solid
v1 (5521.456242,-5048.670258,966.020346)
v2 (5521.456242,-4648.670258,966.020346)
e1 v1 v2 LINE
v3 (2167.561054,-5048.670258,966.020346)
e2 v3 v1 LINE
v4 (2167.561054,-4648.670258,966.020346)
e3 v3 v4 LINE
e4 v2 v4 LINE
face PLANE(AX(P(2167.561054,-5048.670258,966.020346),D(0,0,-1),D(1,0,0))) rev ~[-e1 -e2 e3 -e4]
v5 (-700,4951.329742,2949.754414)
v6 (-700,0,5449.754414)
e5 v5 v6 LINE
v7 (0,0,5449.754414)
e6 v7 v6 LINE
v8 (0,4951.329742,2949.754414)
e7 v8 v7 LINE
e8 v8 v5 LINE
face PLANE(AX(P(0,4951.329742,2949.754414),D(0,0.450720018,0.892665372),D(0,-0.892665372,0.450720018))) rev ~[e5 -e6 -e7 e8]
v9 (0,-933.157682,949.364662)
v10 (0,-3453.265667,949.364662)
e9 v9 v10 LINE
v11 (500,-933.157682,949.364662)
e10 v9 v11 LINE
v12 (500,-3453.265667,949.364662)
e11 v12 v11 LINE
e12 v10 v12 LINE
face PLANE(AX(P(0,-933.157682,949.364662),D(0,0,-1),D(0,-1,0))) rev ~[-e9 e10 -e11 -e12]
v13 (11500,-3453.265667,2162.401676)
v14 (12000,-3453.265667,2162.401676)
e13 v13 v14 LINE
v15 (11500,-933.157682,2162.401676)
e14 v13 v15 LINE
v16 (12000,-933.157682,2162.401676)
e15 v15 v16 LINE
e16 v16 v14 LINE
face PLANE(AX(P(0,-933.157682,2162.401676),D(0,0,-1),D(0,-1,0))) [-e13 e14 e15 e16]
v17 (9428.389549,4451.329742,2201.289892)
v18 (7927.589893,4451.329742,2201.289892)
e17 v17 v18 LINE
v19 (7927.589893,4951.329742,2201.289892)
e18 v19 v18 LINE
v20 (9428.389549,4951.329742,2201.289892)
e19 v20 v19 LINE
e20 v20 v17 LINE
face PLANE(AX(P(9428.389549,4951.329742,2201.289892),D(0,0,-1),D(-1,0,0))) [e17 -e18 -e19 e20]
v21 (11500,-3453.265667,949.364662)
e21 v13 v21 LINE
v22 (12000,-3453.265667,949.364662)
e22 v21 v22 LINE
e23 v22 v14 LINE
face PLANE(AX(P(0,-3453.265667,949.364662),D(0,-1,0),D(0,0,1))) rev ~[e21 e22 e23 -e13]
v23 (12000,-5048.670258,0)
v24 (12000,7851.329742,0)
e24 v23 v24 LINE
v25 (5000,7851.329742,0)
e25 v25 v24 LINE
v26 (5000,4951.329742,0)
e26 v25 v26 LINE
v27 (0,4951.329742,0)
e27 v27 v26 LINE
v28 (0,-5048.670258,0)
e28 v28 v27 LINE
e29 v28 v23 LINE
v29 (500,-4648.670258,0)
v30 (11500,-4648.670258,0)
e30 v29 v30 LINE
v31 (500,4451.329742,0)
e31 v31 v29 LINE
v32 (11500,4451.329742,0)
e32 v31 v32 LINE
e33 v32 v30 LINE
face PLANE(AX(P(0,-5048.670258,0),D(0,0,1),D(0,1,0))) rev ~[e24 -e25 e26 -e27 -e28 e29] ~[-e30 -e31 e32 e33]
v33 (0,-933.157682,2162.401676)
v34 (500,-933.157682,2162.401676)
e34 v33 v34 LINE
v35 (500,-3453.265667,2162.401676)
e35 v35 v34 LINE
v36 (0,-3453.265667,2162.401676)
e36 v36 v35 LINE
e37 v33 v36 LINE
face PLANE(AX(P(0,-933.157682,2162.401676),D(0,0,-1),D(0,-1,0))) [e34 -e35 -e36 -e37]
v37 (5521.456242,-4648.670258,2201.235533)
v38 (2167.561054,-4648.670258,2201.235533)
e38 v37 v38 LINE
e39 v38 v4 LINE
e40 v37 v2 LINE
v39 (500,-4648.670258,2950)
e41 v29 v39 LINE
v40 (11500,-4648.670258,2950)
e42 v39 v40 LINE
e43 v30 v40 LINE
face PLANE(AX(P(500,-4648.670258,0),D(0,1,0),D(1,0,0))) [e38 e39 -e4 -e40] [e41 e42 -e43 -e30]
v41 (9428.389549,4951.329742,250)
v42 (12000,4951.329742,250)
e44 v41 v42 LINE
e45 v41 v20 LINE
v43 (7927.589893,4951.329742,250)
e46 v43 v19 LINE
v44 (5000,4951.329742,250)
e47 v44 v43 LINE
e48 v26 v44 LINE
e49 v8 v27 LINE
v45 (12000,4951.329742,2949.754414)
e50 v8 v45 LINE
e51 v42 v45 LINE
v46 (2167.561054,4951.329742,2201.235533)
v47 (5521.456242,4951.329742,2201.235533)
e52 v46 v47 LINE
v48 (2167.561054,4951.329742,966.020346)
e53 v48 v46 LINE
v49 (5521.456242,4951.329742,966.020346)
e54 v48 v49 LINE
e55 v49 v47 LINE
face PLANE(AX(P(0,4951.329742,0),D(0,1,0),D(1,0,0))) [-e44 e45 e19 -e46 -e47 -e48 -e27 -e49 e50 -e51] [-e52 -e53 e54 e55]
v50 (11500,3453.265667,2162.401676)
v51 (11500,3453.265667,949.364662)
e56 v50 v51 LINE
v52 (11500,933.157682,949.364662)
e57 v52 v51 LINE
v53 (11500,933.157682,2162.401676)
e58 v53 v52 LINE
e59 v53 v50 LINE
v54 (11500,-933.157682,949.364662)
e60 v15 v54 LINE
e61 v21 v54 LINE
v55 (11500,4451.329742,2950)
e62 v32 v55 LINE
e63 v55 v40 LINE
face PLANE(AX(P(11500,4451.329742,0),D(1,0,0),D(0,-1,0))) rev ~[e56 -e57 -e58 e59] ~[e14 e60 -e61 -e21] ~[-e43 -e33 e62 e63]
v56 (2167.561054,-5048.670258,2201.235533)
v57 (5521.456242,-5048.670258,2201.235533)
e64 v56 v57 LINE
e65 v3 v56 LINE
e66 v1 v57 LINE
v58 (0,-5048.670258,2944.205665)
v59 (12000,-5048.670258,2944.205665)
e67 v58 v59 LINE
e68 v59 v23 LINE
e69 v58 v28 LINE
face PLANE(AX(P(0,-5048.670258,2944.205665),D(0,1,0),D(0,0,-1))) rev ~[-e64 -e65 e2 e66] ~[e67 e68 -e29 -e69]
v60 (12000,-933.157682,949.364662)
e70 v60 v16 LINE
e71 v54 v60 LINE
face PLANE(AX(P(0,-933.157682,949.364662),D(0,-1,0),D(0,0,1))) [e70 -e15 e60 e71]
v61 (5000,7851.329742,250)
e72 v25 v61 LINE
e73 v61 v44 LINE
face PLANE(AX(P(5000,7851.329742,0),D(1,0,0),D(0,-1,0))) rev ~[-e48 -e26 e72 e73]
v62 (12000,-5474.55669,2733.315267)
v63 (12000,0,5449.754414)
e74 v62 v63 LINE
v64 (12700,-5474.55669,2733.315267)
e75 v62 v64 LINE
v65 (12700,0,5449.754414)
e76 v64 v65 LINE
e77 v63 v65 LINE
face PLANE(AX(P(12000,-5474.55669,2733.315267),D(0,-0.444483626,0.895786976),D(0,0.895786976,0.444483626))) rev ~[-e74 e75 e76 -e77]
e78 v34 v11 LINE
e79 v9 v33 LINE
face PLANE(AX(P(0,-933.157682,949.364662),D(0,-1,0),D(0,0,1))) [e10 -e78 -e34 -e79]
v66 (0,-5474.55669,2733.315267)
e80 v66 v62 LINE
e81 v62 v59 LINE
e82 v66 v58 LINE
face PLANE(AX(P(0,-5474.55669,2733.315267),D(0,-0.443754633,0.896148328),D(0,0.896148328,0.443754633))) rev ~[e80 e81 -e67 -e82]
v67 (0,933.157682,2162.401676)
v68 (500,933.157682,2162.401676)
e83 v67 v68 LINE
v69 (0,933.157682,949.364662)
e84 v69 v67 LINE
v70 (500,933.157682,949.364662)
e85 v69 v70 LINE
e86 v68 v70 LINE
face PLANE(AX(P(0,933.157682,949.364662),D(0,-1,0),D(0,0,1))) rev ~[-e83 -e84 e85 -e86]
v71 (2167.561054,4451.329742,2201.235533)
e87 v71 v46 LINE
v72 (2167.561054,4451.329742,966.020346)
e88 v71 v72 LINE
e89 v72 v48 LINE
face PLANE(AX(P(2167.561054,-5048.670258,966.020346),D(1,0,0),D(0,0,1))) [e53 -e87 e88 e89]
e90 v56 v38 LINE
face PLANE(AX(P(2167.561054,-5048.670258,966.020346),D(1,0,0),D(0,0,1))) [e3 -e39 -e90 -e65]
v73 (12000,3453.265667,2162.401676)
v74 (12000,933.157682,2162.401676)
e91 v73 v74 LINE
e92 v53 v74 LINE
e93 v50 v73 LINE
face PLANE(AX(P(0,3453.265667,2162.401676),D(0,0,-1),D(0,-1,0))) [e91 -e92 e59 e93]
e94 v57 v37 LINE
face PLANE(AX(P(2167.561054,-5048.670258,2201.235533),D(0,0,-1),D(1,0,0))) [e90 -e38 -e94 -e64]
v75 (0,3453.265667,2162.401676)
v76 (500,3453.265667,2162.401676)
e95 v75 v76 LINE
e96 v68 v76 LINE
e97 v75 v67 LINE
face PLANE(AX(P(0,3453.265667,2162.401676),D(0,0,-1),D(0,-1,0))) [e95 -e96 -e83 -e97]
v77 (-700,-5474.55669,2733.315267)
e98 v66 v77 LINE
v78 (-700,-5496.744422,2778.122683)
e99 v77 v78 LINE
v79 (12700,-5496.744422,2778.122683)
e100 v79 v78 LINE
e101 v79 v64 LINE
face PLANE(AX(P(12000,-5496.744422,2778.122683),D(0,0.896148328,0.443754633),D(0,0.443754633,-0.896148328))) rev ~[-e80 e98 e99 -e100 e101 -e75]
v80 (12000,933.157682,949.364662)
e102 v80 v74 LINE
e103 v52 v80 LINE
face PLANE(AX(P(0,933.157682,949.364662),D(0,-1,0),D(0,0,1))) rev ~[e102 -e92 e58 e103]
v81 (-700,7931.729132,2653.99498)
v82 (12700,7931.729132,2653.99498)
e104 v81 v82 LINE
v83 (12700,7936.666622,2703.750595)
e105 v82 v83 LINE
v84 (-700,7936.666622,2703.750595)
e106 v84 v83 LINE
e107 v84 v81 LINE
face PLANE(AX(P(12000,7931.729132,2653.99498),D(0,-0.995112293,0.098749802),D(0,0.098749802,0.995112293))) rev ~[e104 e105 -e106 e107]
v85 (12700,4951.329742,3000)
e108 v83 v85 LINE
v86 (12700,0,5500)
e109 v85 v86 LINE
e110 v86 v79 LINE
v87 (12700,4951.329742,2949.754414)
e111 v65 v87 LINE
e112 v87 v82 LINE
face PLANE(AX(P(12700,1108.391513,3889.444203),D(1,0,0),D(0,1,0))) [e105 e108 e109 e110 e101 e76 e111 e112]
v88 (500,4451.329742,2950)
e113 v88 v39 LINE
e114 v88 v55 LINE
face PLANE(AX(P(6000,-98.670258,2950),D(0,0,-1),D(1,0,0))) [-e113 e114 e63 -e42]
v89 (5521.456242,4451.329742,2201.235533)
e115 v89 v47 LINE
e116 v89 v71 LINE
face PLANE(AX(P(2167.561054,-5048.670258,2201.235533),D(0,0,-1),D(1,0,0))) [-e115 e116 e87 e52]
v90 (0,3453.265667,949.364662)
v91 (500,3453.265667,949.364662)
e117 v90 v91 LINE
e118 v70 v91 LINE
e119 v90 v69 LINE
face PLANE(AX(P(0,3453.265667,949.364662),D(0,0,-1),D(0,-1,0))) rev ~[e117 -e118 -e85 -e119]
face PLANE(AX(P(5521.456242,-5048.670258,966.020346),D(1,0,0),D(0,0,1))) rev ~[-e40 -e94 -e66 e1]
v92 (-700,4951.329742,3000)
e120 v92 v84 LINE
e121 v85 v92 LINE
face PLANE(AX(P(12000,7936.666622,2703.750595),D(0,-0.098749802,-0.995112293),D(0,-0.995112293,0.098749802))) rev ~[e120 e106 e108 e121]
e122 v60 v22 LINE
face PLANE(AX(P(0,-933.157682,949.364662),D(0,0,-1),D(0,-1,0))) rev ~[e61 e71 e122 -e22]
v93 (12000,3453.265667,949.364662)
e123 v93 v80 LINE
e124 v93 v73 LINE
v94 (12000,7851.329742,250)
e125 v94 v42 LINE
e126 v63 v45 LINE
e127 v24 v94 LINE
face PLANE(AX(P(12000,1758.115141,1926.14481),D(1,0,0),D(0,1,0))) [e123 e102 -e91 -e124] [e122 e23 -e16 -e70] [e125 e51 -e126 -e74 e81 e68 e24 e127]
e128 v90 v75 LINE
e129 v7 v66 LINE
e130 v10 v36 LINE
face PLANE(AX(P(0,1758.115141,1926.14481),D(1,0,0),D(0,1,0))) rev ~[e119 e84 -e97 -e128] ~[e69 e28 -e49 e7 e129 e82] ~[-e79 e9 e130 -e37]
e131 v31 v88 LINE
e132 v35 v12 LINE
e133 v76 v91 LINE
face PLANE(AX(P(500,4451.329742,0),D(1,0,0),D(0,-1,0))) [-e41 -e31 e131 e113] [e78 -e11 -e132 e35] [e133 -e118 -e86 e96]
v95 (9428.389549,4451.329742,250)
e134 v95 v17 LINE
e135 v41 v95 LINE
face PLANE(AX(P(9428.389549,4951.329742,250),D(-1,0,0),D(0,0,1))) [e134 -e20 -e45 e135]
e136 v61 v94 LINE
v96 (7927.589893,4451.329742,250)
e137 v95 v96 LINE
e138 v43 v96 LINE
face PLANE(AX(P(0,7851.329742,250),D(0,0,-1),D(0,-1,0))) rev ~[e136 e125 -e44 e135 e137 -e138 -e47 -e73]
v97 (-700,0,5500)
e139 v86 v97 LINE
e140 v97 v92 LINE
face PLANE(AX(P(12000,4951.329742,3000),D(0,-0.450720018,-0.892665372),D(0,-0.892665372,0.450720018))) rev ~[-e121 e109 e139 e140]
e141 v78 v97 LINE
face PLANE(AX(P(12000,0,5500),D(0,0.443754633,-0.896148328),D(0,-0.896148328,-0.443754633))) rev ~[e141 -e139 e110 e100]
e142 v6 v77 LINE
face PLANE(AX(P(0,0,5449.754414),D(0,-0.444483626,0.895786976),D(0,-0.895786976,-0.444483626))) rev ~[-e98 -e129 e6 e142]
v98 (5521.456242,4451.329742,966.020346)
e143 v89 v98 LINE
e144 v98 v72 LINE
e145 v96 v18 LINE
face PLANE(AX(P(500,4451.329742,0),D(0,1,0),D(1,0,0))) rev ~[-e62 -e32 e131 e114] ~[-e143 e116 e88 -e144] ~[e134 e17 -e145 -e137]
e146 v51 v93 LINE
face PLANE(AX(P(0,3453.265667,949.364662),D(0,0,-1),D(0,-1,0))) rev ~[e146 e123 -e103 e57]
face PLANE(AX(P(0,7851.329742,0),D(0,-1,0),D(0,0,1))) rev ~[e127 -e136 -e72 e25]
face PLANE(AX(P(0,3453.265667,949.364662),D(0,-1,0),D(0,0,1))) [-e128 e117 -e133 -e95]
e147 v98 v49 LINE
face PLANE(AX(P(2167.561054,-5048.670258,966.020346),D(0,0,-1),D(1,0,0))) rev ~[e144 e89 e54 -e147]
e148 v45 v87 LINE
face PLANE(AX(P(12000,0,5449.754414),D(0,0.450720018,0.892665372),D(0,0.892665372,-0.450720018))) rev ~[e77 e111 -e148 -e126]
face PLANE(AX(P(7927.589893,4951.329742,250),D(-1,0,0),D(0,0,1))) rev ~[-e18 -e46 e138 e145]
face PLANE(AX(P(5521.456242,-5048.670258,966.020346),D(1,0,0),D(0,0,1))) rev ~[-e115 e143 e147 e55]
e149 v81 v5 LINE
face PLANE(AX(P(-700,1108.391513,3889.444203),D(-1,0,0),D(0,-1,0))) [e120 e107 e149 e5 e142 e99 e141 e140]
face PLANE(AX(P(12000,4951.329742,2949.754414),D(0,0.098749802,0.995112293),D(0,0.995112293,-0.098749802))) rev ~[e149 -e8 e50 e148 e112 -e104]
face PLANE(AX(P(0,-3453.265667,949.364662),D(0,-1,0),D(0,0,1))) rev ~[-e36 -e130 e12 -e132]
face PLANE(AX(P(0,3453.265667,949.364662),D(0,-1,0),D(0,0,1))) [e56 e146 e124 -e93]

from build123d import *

# Parameters (mm, degrees)
F1_DEPTH  = 12000
F2_W      = 5000
F2_H      = 2900
F3_DEPTH  = 250
F5_DEPTH  = 700
F7_DEPTH  = 700
F8_W      = 11000
F8_H      = 9100
F9_DEPTH  = 2950
F10_W     = 2520.1079845428
F10_H     = 1213.0370140076
F11_DEPTH = 12000
F12_W     = 3353.8951873779
F12_H     = 1235.2151870728
F13_DEPTH = 10000
F14_W     = 1500.7996559143
F14_H     = 1951.2898921967
F15_DEPTH = 500


with BuildPart() as f1:
    # F0 (on Right) → F1 (new body)
    with BuildSketch(Plane.YZ):
        Polygon((-5048.6702581479, 2944.2056650102), (-5048.6702581479, 0), (4951.3297418521, 0), (7851.3297418521, 0), (7851.3297418521, 250), (4951.3297418521, 250), (4951.3297418521, 2949.7544143235), (7931.7291322167, 2653.9949799284), (7936.6666223066, 2703.7505946027), (4951.3297418521, 3000), (0, 5500), (-5048.6702581479, 3000), (-5496.7444220318, 2778.1226833141), (-5474.5566903632, 2733.3152669257), align=None)
    extrude(amount=F1_DEPTH)

    # F2 (on face) → F3 (cut)
    with BuildSketch(Plane(origin=(0, 0, 0), x_dir=(1, 0, 0), z_dir=(0, 0, -1))):
        with Locations((2500, -6401.3297418521)):
            Rectangle(F2_W, F2_H)
    extrude(amount=-F3_DEPTH, mode=Mode.SUBTRACT)

    # F4 (on face) → F5 (join)
    with BuildSketch(Plane(origin=(0, 0, 0), x_dir=(0, -1, 0), z_dir=(-1, 0, 0))):
        Polygon((5474.5566903632, 2733.3152669257), (5496.7444220318, 2778.1226833141), (0, 5500), (-4951.3297418521, 3000), (-7936.6666223066, 2703.7505946027), (-7931.7291322167, 2653.9949799284), (-4951.3297418521, 2949.7544143235), (0, 5449.7544143235), align=None)
    extrude(amount=F5_DEPTH)

    # F6 (on face) → F7 (join)
    with BuildSketch(Plane.YZ.offset(12000)):
        Polygon((-5496.7444220318, 2778.1226833141), (-5474.5566903632, 2733.3152669257), (0, 5449.7544143235), (4951.3297418521, 2949.7544143235), (7931.7291322167, 2653.9949799284), (7936.6666223066, 2703.7505946027), (4951.3297418521, 3000), (0, 5500), align=None)
    extrude(amount=F7_DEPTH)

    # F8 (on face) → F9 (cut)
    with BuildSketch(Plane(origin=(0, 0, 0), x_dir=(1, 0, 0), z_dir=(0, 0, -1))):
        with Locations((6000, 98.6702581479)):
            Rectangle(F8_W, F8_H)
    extrude(amount=-F9_DEPTH, mode=Mode.SUBTRACT)

    # F10 (on face) → F11 (cut)
    with BuildSketch(Plane(origin=(0, 0, 0), x_dir=(0, -1, 0), z_dir=(-1, 0, 0))):
        with Locations((-2193.2116746902, 1555.8831691742)):
            Rectangle(F10_W, F10_H)
        with Locations((2193.2116746902, 1555.8831691742)):
            Rectangle(F10_W, F10_H)
    extrude(amount=-F11_DEPTH, mode=Mode.SUBTRACT)

    # F12 (on face) → F13 (cut)
    with BuildSketch(Plane.XZ.offset(5048.6702581479)):
        with Locations((3844.5086479187, 1583.6279392242)):
            Rectangle(F12_W, F12_H)
    extrude(amount=-F13_DEPTH, mode=Mode.SUBTRACT)

    # F14 (on face) → F15 (cut)
    with BuildSketch(Plane(origin=(0, 4951.3297418521, 0), x_dir=(-1, 0, 0), z_dir=(0, 1, 0))):
        with Locations((-8677.9897212982, 1225.6449460983)):
            Rectangle(F14_W, F14_H)
    extrude(amount=-F15_DEPTH, mode=Mode.SUBTRACT)


solid = f1.part
